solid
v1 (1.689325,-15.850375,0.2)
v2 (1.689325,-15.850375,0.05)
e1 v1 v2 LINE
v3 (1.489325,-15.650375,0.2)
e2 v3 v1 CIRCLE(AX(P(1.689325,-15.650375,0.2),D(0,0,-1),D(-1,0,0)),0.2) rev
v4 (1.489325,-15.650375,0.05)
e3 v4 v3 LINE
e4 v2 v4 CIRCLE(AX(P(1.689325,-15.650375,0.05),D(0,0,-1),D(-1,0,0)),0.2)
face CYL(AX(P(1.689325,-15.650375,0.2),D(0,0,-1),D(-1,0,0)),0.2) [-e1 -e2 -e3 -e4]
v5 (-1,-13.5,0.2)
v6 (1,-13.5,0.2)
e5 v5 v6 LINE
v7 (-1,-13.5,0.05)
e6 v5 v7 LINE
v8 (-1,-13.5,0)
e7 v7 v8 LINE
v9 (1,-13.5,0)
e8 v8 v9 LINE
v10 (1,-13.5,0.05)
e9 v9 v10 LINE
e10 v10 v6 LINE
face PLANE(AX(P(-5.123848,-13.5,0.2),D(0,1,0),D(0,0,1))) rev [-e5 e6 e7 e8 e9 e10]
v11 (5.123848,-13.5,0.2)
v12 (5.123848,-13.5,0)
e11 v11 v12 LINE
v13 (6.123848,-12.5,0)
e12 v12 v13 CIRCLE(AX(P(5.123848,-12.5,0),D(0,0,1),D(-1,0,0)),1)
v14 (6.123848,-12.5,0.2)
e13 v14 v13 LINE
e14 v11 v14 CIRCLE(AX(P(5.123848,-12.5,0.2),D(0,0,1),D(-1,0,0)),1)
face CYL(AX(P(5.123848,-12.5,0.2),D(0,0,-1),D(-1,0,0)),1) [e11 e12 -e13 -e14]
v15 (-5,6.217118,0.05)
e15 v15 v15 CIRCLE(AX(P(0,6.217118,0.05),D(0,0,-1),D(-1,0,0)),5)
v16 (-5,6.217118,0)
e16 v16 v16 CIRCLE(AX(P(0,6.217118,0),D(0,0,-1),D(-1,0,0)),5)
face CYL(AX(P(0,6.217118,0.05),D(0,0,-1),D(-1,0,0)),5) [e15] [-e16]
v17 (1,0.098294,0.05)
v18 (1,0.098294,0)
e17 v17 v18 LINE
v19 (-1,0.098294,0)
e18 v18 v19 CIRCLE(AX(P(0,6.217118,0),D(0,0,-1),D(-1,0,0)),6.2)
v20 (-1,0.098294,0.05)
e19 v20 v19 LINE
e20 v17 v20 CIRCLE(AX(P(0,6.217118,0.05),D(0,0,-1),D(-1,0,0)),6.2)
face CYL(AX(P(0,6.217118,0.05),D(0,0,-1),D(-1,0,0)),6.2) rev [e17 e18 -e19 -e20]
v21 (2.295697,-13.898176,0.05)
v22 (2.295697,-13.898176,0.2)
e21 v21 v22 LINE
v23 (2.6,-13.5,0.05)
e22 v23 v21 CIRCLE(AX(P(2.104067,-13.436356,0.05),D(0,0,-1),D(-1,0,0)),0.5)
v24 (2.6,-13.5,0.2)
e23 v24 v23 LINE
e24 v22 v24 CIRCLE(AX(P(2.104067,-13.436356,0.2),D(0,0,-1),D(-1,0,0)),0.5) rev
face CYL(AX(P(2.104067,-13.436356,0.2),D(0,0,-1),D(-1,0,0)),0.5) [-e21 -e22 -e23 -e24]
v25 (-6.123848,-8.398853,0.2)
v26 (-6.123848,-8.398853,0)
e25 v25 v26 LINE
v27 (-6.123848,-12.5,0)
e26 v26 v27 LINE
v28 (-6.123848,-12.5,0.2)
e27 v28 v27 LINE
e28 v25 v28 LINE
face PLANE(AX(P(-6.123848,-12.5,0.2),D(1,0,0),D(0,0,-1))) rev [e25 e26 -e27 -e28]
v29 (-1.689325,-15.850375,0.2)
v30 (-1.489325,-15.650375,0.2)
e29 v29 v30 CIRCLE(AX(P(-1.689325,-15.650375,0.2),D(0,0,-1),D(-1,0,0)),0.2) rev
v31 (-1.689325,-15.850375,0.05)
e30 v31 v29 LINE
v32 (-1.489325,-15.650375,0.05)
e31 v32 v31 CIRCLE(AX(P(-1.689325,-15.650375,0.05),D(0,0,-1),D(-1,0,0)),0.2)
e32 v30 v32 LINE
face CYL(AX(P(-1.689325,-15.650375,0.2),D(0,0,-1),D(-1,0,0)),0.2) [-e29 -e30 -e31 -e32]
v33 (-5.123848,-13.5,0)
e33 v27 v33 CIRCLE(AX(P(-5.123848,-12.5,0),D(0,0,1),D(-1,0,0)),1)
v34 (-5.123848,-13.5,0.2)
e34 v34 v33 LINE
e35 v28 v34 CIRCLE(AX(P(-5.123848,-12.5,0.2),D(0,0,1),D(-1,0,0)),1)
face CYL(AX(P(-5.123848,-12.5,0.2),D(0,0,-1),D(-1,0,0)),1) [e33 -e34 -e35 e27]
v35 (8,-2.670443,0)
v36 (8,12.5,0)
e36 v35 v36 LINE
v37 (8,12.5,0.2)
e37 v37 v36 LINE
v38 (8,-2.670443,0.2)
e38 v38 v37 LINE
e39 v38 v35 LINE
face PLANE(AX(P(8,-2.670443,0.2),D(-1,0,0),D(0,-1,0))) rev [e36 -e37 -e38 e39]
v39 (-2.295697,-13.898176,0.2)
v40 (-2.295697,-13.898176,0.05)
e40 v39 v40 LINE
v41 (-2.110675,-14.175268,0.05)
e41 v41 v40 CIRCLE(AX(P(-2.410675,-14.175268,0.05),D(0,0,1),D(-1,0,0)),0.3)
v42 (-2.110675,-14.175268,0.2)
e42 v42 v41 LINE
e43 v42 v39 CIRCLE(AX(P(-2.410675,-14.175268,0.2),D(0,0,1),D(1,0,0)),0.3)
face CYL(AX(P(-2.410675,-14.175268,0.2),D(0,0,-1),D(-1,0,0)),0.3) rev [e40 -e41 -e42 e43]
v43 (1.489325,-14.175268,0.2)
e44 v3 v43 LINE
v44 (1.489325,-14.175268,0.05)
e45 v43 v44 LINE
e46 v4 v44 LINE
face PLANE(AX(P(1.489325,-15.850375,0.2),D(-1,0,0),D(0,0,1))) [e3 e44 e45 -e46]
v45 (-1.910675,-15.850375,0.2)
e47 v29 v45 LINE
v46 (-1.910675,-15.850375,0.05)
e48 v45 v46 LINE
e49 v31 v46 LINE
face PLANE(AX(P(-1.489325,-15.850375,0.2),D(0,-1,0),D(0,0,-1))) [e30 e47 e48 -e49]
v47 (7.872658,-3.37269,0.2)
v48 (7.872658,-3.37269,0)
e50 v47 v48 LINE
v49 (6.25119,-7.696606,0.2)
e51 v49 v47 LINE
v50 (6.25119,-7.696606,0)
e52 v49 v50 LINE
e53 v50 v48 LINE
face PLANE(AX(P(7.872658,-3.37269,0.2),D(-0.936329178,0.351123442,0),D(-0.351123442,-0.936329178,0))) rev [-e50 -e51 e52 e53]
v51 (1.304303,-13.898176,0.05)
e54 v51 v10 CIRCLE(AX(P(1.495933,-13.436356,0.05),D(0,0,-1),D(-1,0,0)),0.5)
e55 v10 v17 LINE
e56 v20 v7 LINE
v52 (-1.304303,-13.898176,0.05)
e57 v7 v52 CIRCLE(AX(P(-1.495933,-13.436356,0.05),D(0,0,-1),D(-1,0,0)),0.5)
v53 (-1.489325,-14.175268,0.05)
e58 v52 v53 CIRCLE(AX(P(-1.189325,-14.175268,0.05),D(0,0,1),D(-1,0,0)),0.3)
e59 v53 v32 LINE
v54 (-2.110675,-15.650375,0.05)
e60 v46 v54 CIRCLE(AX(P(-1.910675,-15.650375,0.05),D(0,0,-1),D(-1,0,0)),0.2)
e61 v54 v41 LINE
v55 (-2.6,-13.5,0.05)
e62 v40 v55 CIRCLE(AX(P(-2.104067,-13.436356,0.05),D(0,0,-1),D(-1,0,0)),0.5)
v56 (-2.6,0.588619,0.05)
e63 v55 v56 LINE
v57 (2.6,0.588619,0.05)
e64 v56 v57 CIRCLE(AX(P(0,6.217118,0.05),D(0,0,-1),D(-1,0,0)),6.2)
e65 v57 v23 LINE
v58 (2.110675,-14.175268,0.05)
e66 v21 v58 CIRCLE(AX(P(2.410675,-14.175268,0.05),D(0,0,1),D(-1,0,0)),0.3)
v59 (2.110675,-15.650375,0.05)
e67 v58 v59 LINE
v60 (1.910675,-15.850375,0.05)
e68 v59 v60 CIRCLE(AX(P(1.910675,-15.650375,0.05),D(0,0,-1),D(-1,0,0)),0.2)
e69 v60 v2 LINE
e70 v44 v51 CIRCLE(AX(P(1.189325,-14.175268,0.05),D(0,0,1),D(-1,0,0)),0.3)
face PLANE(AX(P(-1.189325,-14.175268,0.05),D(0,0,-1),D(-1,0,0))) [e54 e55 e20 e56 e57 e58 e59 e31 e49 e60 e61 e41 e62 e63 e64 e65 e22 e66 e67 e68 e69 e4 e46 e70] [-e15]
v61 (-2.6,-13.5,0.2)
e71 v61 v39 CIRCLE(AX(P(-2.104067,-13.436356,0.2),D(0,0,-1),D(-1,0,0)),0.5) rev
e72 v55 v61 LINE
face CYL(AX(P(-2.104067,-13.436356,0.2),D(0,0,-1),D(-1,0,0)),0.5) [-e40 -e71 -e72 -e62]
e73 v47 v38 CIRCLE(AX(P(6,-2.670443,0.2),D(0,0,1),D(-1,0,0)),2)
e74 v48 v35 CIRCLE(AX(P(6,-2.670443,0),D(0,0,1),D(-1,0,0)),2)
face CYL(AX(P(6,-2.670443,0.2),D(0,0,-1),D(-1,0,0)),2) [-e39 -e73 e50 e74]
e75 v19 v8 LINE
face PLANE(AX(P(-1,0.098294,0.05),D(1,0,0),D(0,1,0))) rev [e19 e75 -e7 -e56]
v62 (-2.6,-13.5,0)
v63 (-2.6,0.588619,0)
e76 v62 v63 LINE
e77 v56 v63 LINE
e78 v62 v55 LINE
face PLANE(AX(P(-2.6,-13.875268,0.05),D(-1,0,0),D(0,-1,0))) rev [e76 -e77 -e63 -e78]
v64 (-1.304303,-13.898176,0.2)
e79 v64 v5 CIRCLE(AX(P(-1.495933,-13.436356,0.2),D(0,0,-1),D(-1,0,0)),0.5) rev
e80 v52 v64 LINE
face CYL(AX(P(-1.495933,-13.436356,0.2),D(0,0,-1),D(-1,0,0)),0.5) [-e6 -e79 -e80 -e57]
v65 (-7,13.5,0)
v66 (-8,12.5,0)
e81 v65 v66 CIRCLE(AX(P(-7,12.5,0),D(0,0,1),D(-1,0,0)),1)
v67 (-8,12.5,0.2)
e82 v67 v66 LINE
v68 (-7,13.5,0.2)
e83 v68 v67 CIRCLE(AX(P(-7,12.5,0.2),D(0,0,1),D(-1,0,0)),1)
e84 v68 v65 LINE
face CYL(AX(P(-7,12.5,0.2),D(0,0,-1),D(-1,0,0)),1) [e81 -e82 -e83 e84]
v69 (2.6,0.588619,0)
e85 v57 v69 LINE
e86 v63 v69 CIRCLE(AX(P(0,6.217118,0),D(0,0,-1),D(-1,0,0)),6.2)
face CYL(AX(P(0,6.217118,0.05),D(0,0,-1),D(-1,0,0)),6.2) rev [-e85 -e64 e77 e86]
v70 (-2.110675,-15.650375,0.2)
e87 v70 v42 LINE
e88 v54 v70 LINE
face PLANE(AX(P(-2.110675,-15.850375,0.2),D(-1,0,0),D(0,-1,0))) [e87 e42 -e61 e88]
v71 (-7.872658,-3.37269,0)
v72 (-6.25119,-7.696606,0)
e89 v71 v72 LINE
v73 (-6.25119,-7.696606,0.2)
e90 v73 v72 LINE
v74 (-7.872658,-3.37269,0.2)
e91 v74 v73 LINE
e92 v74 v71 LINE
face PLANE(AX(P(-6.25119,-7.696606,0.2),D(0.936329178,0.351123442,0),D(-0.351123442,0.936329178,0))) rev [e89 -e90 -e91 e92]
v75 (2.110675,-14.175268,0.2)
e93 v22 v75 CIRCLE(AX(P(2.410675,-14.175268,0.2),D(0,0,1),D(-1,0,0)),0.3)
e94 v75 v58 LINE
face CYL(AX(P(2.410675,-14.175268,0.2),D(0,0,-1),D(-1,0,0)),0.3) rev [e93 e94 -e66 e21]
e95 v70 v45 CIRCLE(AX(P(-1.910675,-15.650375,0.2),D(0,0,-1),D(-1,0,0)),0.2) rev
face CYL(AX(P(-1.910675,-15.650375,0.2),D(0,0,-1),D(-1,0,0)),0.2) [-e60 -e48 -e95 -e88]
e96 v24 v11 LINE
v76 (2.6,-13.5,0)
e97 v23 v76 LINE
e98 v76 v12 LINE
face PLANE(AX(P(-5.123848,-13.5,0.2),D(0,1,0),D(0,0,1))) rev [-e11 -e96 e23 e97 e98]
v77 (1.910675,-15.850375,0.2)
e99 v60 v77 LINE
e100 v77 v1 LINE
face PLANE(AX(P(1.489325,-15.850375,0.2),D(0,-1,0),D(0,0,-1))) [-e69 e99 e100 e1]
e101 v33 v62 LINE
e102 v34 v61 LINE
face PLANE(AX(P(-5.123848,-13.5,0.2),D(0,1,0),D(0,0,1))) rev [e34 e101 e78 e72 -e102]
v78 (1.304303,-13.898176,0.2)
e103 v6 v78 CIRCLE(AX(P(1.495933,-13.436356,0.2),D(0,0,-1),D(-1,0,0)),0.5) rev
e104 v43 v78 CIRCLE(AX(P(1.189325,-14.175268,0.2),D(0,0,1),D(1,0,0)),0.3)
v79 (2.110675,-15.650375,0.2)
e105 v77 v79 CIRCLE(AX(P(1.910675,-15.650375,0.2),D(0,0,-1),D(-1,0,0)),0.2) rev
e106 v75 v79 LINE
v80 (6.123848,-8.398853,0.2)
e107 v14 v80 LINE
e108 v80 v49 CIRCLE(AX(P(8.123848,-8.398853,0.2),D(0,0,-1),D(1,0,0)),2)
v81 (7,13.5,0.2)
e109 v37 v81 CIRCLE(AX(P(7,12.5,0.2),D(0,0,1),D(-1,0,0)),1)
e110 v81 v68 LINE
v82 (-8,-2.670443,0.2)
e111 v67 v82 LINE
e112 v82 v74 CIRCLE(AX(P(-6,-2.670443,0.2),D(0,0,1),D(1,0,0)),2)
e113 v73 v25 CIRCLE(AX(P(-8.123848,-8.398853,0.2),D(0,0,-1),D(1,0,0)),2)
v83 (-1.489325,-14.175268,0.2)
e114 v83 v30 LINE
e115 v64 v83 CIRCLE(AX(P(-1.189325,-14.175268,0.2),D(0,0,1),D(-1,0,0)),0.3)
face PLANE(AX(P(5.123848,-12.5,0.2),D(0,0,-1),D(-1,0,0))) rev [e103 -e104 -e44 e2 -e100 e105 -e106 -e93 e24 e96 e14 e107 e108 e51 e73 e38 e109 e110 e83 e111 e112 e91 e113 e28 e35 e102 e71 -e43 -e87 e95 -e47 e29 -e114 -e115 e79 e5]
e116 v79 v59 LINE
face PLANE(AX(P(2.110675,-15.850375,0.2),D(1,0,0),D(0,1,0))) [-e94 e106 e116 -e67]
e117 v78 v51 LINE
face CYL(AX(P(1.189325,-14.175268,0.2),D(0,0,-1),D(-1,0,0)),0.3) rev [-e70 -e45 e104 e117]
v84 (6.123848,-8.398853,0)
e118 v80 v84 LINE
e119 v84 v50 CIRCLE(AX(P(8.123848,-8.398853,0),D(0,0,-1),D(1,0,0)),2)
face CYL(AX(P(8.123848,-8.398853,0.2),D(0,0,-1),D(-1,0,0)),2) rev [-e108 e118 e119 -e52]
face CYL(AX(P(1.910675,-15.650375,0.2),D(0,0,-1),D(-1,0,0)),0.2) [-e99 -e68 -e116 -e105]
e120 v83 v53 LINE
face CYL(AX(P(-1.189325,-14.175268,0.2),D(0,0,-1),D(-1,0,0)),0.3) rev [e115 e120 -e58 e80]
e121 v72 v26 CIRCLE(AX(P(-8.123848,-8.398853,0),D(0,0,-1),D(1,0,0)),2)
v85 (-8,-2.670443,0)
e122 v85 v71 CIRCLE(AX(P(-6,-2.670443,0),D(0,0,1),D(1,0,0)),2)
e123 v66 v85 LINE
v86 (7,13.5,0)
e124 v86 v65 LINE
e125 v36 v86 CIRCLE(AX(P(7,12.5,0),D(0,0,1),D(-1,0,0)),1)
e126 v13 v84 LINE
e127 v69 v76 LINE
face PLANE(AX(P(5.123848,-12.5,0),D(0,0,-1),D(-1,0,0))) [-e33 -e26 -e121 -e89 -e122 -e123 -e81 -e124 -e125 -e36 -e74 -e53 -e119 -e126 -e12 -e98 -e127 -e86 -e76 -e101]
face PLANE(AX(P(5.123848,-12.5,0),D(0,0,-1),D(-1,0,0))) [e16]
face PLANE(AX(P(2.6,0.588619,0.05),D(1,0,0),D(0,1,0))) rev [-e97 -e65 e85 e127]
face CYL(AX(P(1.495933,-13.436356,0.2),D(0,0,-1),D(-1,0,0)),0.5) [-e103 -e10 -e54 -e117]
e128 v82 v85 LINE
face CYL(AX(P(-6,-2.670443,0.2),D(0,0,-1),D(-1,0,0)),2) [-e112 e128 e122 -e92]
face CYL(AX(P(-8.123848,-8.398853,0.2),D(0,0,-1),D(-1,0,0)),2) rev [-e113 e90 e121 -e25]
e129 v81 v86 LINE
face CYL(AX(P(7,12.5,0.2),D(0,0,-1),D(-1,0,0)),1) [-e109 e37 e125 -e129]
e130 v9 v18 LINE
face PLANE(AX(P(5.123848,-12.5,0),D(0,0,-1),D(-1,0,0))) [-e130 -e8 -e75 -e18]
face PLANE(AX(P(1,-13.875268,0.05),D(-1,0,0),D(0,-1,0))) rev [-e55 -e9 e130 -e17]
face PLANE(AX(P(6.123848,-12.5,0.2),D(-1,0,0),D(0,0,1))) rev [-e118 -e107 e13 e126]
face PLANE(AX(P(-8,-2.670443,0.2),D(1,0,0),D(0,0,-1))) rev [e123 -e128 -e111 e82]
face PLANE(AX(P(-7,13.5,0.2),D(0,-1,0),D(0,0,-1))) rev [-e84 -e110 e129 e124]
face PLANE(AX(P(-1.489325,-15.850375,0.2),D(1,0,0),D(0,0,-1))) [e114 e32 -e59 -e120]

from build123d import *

# Parameters (mm, degrees)
BOSS_EXTRUDE1_DEPTH = 0.2
SKETCH3_R           = 5
BOSS_EXTRUDE2_DEPTH = 0.2
SKETCH4_R           = 5
CUT_EXTRUDE1_DEPTH  = 0.05
FILLET1_R           = 0.5
FILLET2_R           = 0.2


with BuildPart() as part:
    # Sketch2 → Boss-Extrude1 (new body)
    with BuildSketch(Plane.XY):
        with BuildLine():
            Line((-5.123848106, -13.5), (5.123848106, -13.5))
            ThreePointArc((5.123848106, -13.5), (5.830954887, -13.207106781), (6.123848106, -12.5))
            Line((6.123848106, -12.5), (6.123848106, -8.39885311))
            ThreePointArc((6.123848106, -8.39885311), (6.155941006, -8.042003499), (6.251189751, -7.696606227))
            Line((6.251189751, -7.696606227), (7.872658355, -3.372689949))
            ThreePointArc((7.872658355, -3.372689949), (7.9679071, -3.027292676), (8, -2.670443065))
            Line((8, -2.670443065), (8, 12.5))
            ThreePointArc((8, 12.5), (7.707106781, 13.207106781), (7, 13.5))
            Line((7, 13.5), (-7, 13.5))
            ThreePointArc((-7, 13.5), (-7.707106781, 13.207106781), (-8, 12.5))
            Line((-8, 12.5), (-8, -2.670443065))
            ThreePointArc((-8, -2.670443065), (-7.9679071, -3.027292676), (-7.872658355, -3.372689949))
            Line((-7.872658355, -3.372689949), (-6.251189751, -7.696606227))
            ThreePointArc((-6.251189751, -7.696606227), (-6.155941006, -8.042003499), (-6.123848106, -8.39885311))
            Line((-6.123848106, -8.39885311), (-6.123848106, -12.5))
            ThreePointArc((-6.123848106, -12.5), (-5.830954887, -13.207106781), (-5.123848106, -13.5))
        make_face()
    extrude(amount=BOSS_EXTRUDE1_DEPTH)

    # Sketch3 → Boss-Extrude2 (add)
    with BuildSketch(Plane(origin=(0, 0, 0), x_dir=(-1, 0, 0), z_dir=(0, 0, -1))):
        with BuildLine():
            Line((1, 0.098294397), (1, -13.875268119))
            Line((1, -13.875268119), (1.189324579, -13.875268119))
            ThreePointArc((1.189324579, -13.875268119), (1.401456614, -13.963136085), (1.489324579, -14.175268119))
            Line((1.489324579, -14.175268119), (1.489324579, -15.850374766))
            Line((1.489324579, -15.850374766), (2.110675421, -15.850374766))
            Line((2.110675421, -15.850374766), (2.110675421, -14.175268119))
            ThreePointArc((2.110675421, -14.175268119), (2.198543386, -13.963136085), (2.410675421, -13.875268119))
            Line((2.410675421, -13.875268119), (2.6, -13.875268119))
            Line((2.6, -13.875268119), (2.6, 0.588618902))
            ThreePointArc((2.6, 0.588618902), (0, 12.417117813), (-2.6, 0.588618902))
            Line((-2.6, 0.588618902), (-2.6, -13.875268119))
            Line((-2.6, -13.875268119), (-2.410675421, -13.875268119))
            ThreePointArc((-2.410675421, -13.875268119), (-2.198543386, -13.963136085), (-2.110675421, -14.175268119))
            Line((-2.110675421, -14.175268119), (-2.110675421, -15.850374766))
            Line((-2.110675421, -15.850374766), (-1.489324579, -15.850374766))
            Line((-1.489324579, -15.850374766), (-1.489324579, -14.175268119))
            ThreePointArc((-1.489324579, -14.175268119), (-1.401456614, -13.963136085), (-1.189324579, -13.875268119))
            Line((-1.189324579, -13.875268119), (-1, -13.875268119))
            Line((-1, -13.875268119), (-1, 0.098294397))
            ThreePointArc((-1, 0.098294397), (0, 0.017117813), (1, 0.098294397))
        make_face()
        with Locations((0, 6.217117813)):
            Circle(SKETCH3_R, mode=Mode.SUBTRACT)
    extrude(amount=-BOSS_EXTRUDE2_DEPTH)

    # Sketch4 → Cut-Extrude1 (cut)
    with BuildSketch(Plane(origin=(0, 0, 0), x_dir=(-1, 0, 0), z_dir=(0, 0, -1))):
        with BuildLine():
            Line((1, -13.875268119), (1.189324579, -13.875268119))
            ThreePointArc((1.189324579, -13.875268119), (1.401456614, -13.963136085), (1.489324579, -14.175268119))
            Line((1.489324579, -14.175268119), (1.489324579, -15.850374766))
            Line((1.489324579, -15.850374766), (2.110675421, -15.850374766))
            Line((2.110675421, -15.850374766), (2.110675421, -14.175268119))
            ThreePointArc((2.110675421, -14.175268119), (2.198543386, -13.963136085), (2.410675421, -13.875268119))
            Line((2.410675421, -13.875268119), (2.6, -13.875268119))
            Line((2.6, -13.875268119), (2.6, 0.588618902))
            ThreePointArc((2.6, 0.588618902), (0, 12.417117813), (-2.6, 0.588618902))
            Line((-2.6, 0.588618902), (-2.6, -13.875268119))
            Line((-2.6, -13.875268119), (-2.410675421, -13.875268119))
            ThreePointArc((-2.410675421, -13.875268119), (-2.198543386, -13.963136085), (-2.110675421, -14.175268119))
            Line((-2.110675421, -14.175268119), (-2.110675421, -15.850374766))
            Line((-2.110675421, -15.850374766), (-1.489324579, -15.850374766))
            Line((-1.489324579, -15.850374766), (-1.489324579, -14.175268119))
            ThreePointArc((-1.489324579, -14.175268119), (-1.401456614, -13.963136085), (-1.189324579, -13.875268119))
            Line((-1.189324579, -13.875268119), (-1, -13.875268119))
            Line((-1, -13.875268119), (-1, 0.098294397))
            ThreePointArc((-1, 0.098294397), (0, 0.017117813), (1, 0.098294397))
            Line((1, 0.098294397), (1, -13.875268119))
        make_face()
        with Locations((0, 6.217117813)):
            Circle(SKETCH4_R, mode=Mode.SUBTRACT)
    extrude(amount=-CUT_EXTRUDE1_DEPTH, mode=Mode.SUBTRACT)

    # Fillet1
    # the kernel refuses this fillet: 0.5 mm, written as the material it takes off along each edge
    with BuildSketch(Plane(origin=(-2.6, -13.875268119, -0.888170298), x_dir=(0, 1, 0), z_dir=(0, 0, 1)), Plane(origin=(1, -13.875268119, -0.888170298), x_dir=(0, 1, 0), z_dir=(0, 0, 1))) as fillet1_piece_1:
        with BuildLine():
            CenterArc((0.438912275, -0.49593288), FILLET1_R, 97.312922169, 60.15129319)
            Line((-0.022907897, -0.304302692), (-0.069089914, -0.285139673))
            ThreePointArc((-0.069089914, -0.285139673), (-0.05, -0.189324579), (-0.05, 0))
            Line((-0.05, 0), (0, 0.05))
            ThreePointArc((0, 0.05), (0.18763406, 0.05), (0.368903703, 0.049593288))
            Line((0.368903703, 0.049593288), (0.375268119, 0))
        make_face()
    extrude(amount=2.026340595, mode=Mode.SUBTRACT)
    with BuildSketch(Plane(origin=(-1, -13.875268119, -0.888170298), x_dir=(-0.997178450014068, -0.07506756175300172, 0), z_dir=(0, 0, 1)), Plane(origin=(2.6, -13.875268119, -0.888170298), x_dir=(-0.997178450014068, -0.07506756175300161, 0), z_dir=(0, 0, 1))) as fillet1_piece_2:
        with BuildLine():
            CenterArc((0.461585506, -0.474902334), FILLET1_R, 108.23068039, 60.15129319)
            Line((-0.028170463, -0.374209281), (-0.07714606, -0.364139976))
            ThreePointArc((-0.07714606, -0.364139976), (-0.063944154, -0.183351263), (-0.049858923, 0.003753378))
            Line((-0.049858923, 0.003753378), (0.003753378, 0.049858923))
            ThreePointArc((0.003753378, 0.049858923), (0.192543769, 0.035646788), (0.289521549, 0.047490233))
            Line((0.289521549, 0.047490233), (0.305163727, 0))
        make_face()
    extrude(amount=2.026340595, mode=Mode.SUBTRACT)

    # Fillet2
    fillet2_edges = [part.edges().sort_by_distance(p)[0] for p in [
        (-2.110675421, -15.850374766, 0.125),
        (-1.489324579, -15.850374766, 0.125),
        (1.489324579, -15.850374766, 0.125),
        (2.110675421, -15.850374766, 0.125),
    ]]
    fillet(fillet2_edges, radius=FILLET2_R)


solid = part.part
